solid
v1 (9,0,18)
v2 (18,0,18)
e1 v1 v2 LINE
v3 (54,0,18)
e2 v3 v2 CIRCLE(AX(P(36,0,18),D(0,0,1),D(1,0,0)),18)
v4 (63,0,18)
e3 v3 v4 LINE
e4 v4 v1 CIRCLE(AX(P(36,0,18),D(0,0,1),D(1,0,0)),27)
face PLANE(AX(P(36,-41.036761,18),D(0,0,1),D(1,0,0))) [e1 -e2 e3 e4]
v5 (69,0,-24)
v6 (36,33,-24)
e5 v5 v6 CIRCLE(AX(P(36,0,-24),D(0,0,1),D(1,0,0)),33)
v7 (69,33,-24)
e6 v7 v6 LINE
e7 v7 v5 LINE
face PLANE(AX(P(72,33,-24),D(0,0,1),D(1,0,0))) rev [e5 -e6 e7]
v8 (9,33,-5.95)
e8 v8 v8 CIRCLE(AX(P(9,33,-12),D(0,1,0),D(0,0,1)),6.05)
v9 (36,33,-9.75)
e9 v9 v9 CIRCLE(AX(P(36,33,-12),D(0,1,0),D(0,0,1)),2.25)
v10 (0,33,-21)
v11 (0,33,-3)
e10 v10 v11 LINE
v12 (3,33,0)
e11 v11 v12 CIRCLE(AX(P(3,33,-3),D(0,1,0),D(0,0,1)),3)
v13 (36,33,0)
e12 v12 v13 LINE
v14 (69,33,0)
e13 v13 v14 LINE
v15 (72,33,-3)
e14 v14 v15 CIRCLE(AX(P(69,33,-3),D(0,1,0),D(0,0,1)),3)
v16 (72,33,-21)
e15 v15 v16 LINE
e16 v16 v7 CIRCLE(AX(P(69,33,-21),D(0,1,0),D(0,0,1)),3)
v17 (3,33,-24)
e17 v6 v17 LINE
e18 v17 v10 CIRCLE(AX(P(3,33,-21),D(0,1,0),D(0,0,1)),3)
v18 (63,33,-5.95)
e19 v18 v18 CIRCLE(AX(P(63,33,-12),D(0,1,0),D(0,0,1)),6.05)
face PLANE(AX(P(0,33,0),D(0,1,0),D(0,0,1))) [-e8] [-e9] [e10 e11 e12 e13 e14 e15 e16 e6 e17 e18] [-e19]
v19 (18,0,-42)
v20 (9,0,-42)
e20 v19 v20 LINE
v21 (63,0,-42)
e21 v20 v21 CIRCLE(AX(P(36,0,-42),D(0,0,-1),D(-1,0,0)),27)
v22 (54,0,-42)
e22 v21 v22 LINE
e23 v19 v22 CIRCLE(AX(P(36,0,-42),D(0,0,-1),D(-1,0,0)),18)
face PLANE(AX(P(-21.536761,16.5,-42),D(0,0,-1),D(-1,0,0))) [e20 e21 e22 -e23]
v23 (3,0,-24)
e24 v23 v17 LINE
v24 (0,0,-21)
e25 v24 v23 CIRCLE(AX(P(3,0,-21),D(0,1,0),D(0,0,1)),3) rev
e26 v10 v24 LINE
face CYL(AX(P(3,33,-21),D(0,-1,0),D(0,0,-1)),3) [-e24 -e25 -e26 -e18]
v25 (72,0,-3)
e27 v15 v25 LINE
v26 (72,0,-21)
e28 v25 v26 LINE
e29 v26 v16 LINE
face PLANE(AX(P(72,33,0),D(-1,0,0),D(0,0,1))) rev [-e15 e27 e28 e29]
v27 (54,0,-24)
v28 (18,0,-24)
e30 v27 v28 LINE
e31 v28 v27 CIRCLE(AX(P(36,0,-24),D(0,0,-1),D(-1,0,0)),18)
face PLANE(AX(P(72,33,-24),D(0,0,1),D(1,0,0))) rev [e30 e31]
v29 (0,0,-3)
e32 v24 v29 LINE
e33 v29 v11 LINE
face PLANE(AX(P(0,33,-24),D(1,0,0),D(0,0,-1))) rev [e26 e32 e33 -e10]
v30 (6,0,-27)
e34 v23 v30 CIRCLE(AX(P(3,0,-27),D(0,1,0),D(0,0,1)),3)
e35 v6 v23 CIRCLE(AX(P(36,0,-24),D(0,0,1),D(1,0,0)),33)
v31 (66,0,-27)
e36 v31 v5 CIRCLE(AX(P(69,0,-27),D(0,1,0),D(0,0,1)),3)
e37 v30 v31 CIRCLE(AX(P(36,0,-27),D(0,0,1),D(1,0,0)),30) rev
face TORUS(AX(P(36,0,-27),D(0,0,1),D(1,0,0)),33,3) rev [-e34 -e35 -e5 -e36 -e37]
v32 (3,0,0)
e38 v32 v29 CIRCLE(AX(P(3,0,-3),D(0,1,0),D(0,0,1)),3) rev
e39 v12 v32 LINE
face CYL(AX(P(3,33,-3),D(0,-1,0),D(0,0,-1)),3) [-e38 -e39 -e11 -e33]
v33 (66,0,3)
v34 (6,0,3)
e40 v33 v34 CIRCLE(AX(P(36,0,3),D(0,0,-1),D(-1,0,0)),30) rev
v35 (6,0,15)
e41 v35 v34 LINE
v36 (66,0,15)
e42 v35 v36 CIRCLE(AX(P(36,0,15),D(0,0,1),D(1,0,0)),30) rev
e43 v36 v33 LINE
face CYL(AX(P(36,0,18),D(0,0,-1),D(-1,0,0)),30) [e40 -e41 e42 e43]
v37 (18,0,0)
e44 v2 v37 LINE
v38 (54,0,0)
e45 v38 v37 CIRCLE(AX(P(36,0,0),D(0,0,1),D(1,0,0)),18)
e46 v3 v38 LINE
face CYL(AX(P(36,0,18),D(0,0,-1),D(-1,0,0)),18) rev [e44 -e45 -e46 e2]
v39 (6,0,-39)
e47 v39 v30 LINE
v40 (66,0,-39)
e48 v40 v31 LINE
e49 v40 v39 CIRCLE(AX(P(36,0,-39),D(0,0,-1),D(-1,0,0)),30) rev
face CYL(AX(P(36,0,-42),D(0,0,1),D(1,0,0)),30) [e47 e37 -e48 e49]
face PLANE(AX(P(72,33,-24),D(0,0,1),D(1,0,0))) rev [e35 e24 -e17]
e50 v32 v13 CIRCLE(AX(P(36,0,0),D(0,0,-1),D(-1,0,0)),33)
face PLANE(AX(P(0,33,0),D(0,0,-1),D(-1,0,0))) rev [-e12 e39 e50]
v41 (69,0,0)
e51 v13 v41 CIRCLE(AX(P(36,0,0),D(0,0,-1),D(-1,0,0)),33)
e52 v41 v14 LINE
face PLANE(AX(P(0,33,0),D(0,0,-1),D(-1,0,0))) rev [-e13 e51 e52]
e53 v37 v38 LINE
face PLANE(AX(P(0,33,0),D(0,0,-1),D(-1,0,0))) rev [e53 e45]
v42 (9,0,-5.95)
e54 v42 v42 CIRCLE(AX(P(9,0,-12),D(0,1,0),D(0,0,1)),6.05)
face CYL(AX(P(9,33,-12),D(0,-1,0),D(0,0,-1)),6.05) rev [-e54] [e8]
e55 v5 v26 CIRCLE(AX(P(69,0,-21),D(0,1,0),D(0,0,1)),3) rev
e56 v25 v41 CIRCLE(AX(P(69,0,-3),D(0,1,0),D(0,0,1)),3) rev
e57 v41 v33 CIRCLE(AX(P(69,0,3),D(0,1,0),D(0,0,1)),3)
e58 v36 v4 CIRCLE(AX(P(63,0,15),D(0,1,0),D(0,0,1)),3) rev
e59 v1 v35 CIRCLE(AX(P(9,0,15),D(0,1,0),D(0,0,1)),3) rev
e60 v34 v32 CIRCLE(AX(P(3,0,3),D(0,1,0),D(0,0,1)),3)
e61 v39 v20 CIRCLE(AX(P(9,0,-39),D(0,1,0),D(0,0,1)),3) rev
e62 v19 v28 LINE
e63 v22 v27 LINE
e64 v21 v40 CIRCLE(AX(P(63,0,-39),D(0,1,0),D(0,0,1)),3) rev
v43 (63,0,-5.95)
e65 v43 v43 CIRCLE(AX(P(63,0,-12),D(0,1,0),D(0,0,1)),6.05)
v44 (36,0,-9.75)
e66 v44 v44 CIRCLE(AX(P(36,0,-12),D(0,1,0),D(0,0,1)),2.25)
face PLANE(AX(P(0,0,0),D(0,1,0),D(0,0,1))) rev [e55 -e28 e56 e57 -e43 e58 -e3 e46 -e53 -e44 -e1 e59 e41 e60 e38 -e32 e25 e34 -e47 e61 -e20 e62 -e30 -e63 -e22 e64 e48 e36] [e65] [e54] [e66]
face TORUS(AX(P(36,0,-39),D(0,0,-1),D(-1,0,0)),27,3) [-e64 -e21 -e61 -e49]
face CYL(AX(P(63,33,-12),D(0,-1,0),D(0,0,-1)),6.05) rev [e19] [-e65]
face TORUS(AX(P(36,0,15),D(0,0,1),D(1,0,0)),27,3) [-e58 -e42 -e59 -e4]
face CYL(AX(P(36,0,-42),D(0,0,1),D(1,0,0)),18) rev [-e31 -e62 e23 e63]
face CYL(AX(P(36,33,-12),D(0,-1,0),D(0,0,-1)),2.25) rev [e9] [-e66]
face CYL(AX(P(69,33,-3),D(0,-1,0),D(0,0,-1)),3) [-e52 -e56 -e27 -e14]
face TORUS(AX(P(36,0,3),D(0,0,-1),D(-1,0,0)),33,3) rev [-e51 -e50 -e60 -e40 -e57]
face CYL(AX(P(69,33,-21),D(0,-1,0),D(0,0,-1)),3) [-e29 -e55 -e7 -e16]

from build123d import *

# Parameters (mm, degrees)
SKETCH_2_W      = 72
SKETCH_2_H      = 24
SKETCH_2_R      = 6.05
SKETCH_2_R_2    = 2.25
EXTRUDE_1_DEPTH = 33
FILLET_1_R      = 3
EXTRUDE_2_DEPTH = 18
EXTRUDE_START   = 18
EXTRUDE_3_DEPTH = 18
FILLET_2_R      = 3


with BuildPart() as part:
    # 草圖2 → 填料-伸長1 (new body)
    with BuildSketch(Plane(origin=(0, 0, 0), x_dir=(1, 0, 0), z_dir=(0, 1, 0))):
        with Locations((36, 12)):
            Rectangle(SKETCH_2_W, SKETCH_2_H)
        with Locations(Location((9, 12, 0), (0, 0, 270))):
            Circle(SKETCH_2_R, mode=Mode.SUBTRACT)
        with Locations(Location((63, 12, 0), (0, 0, 270))):
            Circle(SKETCH_2_R, mode=Mode.SUBTRACT)
        with Locations(Location((36, 12, 0), (0, 0, 270))):
            Circle(SKETCH_2_R_2, mode=Mode.SUBTRACT)
    extrude(amount=EXTRUDE_1_DEPTH)

    # 圓角1
    fillet_1_edges = [part.edges().sort_by_distance(p)[0] for p in [
        (0, 16.5, -24),
        (72, 16.5, -24),
        (72, 16.5, 0),
        (0, 16.5, 0),
    ]]
    fillet(fillet_1_edges, radius=FILLET_1_R)

    # 草圖4 → 填料-伸長2 (add)
    with BuildSketch(Plane.XY):
        with BuildLine():
            ThreePointArc((66, 0), (36, 30), (6, 0))
            Line((6, 0), (18, 0))
            ThreePointArc((18, 0), (36, 18), (54, 0))
            Line((54, 0), (66, 0))
        make_face()
    extrude(amount=EXTRUDE_2_DEPTH)

    # 草圖5 → 填料-伸長3 (add)
    with BuildSketch(Plane(origin=(0, 0, -24), x_dir=(-1, 0, 0), z_dir=(0, 0, -1)).offset(EXTRUDE_START)):
        with BuildLine():
            ThreePointArc((-6, 0), (-36, 30), (-66, 0))
            Line((-66, 0), (-54, 0))
            ThreePointArc((-54, 0), (-36, 18), (-18, 0))
            Line((-18, 0), (-6, 0))
        make_face()
    extrude(amount=-EXTRUDE_3_DEPTH)

    # 圓角2
    fillet_2_edges = [part.edges().sort_by_distance(p)[0] for p in [
        (36, 30, -42),
        (36, 30, -24),
        (36, 30, 18),
        (36, 30, 0),
    ]]
    fillet(fillet_2_edges, radius=FILLET_2_R - 0.0001)  # a hair under: the kernel refuses the full size


solid = part.part
